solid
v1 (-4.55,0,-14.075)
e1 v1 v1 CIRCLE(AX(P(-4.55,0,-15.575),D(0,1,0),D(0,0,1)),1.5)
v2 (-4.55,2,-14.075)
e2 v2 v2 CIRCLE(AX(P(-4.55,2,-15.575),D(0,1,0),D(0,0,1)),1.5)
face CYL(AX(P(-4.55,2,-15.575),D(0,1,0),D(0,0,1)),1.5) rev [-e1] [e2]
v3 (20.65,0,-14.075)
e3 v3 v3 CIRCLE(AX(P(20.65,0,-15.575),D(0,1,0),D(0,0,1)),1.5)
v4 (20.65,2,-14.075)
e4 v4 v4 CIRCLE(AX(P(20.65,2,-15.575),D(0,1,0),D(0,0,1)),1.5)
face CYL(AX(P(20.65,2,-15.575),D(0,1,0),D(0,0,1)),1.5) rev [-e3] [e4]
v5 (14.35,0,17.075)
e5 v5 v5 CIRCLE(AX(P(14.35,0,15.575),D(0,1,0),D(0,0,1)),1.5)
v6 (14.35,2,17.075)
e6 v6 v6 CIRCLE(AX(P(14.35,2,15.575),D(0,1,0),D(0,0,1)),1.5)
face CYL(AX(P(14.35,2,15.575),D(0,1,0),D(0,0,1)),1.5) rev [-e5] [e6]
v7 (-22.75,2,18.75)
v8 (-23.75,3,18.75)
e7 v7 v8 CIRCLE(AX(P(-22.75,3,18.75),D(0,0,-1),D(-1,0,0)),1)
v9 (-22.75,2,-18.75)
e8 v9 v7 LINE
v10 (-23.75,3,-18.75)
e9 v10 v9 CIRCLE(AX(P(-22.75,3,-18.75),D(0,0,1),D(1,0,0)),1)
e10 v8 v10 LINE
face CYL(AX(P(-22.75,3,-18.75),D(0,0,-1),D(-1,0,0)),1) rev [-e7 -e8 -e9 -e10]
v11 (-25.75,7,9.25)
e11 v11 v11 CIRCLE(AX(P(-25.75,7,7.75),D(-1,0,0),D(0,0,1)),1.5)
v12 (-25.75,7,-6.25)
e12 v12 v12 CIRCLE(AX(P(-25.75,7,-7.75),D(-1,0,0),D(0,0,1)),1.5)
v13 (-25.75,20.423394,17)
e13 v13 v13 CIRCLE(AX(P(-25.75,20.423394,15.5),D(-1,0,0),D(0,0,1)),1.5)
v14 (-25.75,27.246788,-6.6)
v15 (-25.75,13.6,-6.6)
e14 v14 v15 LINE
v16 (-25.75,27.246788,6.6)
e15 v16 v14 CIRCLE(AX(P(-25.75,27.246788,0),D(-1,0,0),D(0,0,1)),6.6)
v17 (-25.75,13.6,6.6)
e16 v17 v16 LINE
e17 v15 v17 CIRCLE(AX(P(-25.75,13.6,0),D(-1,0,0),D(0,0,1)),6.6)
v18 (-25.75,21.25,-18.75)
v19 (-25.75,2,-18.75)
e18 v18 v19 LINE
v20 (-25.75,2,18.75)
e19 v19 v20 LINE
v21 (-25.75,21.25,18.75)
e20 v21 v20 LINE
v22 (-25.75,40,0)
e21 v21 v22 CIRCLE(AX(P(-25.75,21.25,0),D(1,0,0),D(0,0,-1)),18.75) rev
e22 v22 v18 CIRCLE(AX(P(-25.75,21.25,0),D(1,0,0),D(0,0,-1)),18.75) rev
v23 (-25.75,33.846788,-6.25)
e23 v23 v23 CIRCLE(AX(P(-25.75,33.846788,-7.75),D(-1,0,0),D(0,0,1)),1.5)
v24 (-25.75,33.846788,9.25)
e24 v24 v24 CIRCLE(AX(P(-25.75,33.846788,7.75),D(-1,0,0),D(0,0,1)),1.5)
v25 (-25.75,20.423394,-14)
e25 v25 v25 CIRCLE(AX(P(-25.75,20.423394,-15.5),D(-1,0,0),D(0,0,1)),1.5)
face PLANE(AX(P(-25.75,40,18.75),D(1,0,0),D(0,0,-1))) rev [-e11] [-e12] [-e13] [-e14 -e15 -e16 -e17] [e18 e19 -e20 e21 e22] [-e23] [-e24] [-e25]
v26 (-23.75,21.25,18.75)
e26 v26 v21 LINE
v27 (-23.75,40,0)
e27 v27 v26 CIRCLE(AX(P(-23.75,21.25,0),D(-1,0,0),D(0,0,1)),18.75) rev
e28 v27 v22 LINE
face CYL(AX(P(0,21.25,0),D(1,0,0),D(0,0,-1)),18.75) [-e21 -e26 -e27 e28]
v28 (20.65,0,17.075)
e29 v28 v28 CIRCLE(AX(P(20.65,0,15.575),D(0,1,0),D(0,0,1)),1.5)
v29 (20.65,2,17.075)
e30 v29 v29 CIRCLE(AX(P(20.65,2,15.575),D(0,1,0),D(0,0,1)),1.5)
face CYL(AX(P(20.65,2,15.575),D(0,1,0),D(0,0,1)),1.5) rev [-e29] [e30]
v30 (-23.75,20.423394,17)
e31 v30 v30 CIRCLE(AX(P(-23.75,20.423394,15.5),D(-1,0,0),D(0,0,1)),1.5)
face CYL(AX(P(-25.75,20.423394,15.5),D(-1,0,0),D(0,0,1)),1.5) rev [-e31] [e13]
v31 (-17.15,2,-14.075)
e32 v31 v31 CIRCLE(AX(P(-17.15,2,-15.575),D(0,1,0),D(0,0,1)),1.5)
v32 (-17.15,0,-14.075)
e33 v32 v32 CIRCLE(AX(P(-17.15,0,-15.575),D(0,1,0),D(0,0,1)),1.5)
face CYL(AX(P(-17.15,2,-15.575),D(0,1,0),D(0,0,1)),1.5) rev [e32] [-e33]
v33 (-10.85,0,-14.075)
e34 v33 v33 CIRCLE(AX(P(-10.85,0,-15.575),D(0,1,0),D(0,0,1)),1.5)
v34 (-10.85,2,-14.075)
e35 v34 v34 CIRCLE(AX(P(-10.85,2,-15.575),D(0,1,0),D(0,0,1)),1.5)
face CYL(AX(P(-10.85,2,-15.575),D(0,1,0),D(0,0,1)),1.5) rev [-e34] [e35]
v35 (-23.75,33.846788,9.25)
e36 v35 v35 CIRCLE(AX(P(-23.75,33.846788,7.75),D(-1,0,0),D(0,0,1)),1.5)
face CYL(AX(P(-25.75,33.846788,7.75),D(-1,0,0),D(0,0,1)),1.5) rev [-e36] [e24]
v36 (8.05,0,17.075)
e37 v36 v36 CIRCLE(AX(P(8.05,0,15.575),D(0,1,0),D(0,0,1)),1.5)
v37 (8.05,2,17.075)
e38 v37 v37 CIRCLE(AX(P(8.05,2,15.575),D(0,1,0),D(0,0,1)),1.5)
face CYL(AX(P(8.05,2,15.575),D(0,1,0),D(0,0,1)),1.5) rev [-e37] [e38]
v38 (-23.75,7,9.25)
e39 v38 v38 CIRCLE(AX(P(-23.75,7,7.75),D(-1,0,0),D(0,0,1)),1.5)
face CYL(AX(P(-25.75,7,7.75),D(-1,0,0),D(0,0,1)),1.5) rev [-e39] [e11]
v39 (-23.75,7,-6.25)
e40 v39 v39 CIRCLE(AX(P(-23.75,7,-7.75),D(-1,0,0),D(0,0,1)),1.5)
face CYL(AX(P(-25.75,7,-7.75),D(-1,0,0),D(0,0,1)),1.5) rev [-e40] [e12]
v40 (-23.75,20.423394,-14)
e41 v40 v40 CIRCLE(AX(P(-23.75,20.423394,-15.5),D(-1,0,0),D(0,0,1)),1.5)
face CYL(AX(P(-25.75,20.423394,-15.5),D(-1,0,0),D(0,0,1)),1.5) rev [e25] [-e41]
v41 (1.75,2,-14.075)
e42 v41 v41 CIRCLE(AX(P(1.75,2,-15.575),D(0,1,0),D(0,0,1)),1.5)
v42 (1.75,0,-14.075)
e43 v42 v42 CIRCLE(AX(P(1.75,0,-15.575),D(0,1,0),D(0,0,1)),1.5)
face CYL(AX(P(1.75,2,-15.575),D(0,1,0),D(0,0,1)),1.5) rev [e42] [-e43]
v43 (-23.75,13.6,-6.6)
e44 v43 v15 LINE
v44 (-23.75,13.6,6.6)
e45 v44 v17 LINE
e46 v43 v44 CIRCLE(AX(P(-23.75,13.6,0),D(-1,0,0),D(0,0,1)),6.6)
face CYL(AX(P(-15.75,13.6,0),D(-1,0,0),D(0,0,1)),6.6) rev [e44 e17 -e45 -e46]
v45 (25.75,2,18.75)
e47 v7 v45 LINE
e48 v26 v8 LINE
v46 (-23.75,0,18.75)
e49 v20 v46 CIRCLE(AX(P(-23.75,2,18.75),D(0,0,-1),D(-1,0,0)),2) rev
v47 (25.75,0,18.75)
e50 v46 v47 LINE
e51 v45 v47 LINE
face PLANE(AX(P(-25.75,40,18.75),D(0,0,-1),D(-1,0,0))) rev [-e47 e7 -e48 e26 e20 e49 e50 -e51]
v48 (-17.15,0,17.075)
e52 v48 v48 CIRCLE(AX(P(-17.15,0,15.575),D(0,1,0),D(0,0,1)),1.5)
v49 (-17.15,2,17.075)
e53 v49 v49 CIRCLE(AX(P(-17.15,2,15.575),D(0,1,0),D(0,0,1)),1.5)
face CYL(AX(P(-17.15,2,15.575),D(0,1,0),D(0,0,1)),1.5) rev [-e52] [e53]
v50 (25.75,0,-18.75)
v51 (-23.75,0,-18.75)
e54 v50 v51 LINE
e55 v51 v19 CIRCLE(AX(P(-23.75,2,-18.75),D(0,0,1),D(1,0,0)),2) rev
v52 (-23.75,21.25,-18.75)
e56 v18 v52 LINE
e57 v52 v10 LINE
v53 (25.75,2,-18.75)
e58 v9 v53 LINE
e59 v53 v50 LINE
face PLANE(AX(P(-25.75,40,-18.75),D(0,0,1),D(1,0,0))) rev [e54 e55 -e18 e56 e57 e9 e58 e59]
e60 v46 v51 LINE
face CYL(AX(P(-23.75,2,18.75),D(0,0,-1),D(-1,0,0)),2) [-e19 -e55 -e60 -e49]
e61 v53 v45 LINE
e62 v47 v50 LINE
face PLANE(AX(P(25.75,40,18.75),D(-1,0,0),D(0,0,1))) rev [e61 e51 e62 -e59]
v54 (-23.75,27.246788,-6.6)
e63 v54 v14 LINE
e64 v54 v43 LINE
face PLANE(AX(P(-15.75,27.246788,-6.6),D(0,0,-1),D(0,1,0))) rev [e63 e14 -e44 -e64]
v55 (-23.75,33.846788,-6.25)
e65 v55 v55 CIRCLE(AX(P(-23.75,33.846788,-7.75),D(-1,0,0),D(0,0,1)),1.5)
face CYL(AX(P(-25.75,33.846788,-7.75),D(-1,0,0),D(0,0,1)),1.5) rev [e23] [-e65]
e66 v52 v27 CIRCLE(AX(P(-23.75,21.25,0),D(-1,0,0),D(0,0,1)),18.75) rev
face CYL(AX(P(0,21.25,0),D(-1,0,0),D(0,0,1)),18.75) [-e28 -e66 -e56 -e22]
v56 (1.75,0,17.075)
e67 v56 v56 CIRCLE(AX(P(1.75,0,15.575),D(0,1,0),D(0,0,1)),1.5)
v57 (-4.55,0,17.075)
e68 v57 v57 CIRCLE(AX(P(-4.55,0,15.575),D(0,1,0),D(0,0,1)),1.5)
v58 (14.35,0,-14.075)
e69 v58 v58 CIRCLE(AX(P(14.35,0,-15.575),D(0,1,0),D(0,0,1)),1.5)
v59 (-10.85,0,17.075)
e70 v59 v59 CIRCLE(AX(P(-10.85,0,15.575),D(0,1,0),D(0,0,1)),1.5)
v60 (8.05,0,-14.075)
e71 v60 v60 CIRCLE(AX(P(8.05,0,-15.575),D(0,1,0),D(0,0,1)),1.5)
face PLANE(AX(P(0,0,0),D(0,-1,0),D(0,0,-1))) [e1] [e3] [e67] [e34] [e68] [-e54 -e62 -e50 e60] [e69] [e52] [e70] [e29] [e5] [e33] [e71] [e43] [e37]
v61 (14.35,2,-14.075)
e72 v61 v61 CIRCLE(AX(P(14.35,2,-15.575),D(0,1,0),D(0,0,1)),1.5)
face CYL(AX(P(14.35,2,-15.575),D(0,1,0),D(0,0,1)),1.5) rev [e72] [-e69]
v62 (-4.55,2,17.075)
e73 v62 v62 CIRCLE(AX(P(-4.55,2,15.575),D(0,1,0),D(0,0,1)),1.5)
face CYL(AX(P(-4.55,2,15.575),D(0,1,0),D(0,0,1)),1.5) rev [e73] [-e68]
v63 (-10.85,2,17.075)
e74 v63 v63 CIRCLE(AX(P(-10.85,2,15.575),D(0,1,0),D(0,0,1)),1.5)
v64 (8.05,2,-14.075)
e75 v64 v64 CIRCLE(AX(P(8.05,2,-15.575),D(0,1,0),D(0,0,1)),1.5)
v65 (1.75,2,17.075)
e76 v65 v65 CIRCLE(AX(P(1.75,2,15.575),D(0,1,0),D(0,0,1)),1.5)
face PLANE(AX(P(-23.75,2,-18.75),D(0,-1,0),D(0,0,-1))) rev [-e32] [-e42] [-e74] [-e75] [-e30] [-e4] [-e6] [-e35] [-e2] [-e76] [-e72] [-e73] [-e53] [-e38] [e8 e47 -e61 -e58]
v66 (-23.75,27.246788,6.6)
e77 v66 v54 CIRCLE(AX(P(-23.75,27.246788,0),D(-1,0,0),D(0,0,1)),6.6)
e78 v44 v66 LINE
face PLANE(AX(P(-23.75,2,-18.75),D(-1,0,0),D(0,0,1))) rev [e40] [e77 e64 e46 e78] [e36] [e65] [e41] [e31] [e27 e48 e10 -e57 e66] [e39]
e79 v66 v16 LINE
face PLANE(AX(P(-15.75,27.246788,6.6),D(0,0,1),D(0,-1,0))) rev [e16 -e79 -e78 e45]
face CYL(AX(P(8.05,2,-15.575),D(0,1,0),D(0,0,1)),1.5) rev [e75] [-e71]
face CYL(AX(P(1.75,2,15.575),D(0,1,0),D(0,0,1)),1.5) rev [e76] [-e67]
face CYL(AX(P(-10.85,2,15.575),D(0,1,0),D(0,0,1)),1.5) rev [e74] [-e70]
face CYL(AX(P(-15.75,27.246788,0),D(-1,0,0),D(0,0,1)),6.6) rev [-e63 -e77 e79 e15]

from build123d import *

# Parameters (mm, degrees)
SKETCH1_W             = 51.5
SKETCH1_H             = 37.5
BOSS_EXTRUDE1_DEPTH   = 40
SKETCH2_W             = 49.5
SKETCH2_H             = 38
CUT_EXTRUDE1_DEPTH    = 61.574850392
FILLET1_R             = 1
FILLET2_R             = 2
F_3_0MM_DOWEL_HOLE1_D = 3
CUT_EXTRUDE2_DEPTH    = 10
FILLET3_R             = 18.75
F_3_0MM_DOWEL_HOLE2_D = 3


with BuildPart() as part:
    # Sketch1 → Boss-Extrude1 (new body)
    with BuildSketch(Plane(origin=(0, 0, 0), x_dir=(1, 0, 0), z_dir=(0, 1, 0))):
        Rectangle(SKETCH1_W, SKETCH1_H)
    extrude(amount=BOSS_EXTRUDE1_DEPTH)

    # Sketch2 → Cut-Extrude1 (cut, through all)
    with BuildSketch(Plane.XY.offset(18.75)):
        with Locations((1, 21)):
            Rectangle(SKETCH2_W, SKETCH2_H)
    extrude(amount=-CUT_EXTRUDE1_DEPTH, mode=Mode.SUBTRACT)

    # Fillet1
    fillet1_edges = [part.edges().sort_by_distance(p)[0] for p in [
        (-23.75, 2, 0),
    ]]
    fillet(fillet1_edges, radius=FILLET1_R)

    # Fillet2
    fillet2_edges = [part.edges().sort_by_distance(p)[0] for p in [
        (-25.75, 0, 0),
    ]]
    fillet(fillet2_edges, radius=FILLET2_R)

    # Ø3.0mm Dowel Hole1 (through all)
    with Locations(Plane(origin=(0, 2, 0), x_dir=(1, 0, 0), z_dir=(0, 1, 0))):
        with Locations((-17.15, -15.575), (-17.15, 15.575), (-10.85, -15.575), (-4.55, -15.575), (1.75, -15.575), (8.05, -15.575), (14.35, -15.575), (20.65, -15.575), (20.65, 15.575), (14.35, 15.575), (8.05, 15.575), (1.75, 15.575), (-4.55, 15.575), (-10.85, 15.575)):
            Hole(F_3_0MM_DOWEL_HOLE1_D / 2)

    # Sketch7 → Cut-Extrude2 (cut)
    with BuildSketch(Plane.ZY.offset(25.75)):
        with BuildLine():
            Line((6.6, 27.246787517), (6.6, 13.6))
            ThreePointArc((6.6, 13.6), (0, 7), (-6.6, 13.6))
            Line((-6.6, 13.6), (-6.6, 27.246787517))
            ThreePointArc((-6.6, 27.246787517), (0, 33.846787517), (6.6, 27.246787517))
        make_face()
    extrude(amount=-CUT_EXTRUDE2_DEPTH, mode=Mode.SUBTRACT)

    # Fillet3
    fillet3_edges = [part.edges().sort_by_distance(p)[0] for p in [
        (-24.75, 40, 18.75),
        (-24.75, 40, -18.75),
    ]]
    fillet(fillet3_edges, radius=FILLET3_R - 0.0001)  # a hair under: the kernel refuses the full size

    # Ø3.0mm Dowel Hole2 (through all)
    with Locations(Plane.ZY.offset(25.75)):
        with Locations((-7.75, 33.846787517), (7.75, 33.846787517), (15.5, 20.423393759), (7.75, 7), (-7.75, 7), (-15.5, 20.423393759)):
            Hole(F_3_0MM_DOWEL_HOLE2_D / 2)


solid = part.part
